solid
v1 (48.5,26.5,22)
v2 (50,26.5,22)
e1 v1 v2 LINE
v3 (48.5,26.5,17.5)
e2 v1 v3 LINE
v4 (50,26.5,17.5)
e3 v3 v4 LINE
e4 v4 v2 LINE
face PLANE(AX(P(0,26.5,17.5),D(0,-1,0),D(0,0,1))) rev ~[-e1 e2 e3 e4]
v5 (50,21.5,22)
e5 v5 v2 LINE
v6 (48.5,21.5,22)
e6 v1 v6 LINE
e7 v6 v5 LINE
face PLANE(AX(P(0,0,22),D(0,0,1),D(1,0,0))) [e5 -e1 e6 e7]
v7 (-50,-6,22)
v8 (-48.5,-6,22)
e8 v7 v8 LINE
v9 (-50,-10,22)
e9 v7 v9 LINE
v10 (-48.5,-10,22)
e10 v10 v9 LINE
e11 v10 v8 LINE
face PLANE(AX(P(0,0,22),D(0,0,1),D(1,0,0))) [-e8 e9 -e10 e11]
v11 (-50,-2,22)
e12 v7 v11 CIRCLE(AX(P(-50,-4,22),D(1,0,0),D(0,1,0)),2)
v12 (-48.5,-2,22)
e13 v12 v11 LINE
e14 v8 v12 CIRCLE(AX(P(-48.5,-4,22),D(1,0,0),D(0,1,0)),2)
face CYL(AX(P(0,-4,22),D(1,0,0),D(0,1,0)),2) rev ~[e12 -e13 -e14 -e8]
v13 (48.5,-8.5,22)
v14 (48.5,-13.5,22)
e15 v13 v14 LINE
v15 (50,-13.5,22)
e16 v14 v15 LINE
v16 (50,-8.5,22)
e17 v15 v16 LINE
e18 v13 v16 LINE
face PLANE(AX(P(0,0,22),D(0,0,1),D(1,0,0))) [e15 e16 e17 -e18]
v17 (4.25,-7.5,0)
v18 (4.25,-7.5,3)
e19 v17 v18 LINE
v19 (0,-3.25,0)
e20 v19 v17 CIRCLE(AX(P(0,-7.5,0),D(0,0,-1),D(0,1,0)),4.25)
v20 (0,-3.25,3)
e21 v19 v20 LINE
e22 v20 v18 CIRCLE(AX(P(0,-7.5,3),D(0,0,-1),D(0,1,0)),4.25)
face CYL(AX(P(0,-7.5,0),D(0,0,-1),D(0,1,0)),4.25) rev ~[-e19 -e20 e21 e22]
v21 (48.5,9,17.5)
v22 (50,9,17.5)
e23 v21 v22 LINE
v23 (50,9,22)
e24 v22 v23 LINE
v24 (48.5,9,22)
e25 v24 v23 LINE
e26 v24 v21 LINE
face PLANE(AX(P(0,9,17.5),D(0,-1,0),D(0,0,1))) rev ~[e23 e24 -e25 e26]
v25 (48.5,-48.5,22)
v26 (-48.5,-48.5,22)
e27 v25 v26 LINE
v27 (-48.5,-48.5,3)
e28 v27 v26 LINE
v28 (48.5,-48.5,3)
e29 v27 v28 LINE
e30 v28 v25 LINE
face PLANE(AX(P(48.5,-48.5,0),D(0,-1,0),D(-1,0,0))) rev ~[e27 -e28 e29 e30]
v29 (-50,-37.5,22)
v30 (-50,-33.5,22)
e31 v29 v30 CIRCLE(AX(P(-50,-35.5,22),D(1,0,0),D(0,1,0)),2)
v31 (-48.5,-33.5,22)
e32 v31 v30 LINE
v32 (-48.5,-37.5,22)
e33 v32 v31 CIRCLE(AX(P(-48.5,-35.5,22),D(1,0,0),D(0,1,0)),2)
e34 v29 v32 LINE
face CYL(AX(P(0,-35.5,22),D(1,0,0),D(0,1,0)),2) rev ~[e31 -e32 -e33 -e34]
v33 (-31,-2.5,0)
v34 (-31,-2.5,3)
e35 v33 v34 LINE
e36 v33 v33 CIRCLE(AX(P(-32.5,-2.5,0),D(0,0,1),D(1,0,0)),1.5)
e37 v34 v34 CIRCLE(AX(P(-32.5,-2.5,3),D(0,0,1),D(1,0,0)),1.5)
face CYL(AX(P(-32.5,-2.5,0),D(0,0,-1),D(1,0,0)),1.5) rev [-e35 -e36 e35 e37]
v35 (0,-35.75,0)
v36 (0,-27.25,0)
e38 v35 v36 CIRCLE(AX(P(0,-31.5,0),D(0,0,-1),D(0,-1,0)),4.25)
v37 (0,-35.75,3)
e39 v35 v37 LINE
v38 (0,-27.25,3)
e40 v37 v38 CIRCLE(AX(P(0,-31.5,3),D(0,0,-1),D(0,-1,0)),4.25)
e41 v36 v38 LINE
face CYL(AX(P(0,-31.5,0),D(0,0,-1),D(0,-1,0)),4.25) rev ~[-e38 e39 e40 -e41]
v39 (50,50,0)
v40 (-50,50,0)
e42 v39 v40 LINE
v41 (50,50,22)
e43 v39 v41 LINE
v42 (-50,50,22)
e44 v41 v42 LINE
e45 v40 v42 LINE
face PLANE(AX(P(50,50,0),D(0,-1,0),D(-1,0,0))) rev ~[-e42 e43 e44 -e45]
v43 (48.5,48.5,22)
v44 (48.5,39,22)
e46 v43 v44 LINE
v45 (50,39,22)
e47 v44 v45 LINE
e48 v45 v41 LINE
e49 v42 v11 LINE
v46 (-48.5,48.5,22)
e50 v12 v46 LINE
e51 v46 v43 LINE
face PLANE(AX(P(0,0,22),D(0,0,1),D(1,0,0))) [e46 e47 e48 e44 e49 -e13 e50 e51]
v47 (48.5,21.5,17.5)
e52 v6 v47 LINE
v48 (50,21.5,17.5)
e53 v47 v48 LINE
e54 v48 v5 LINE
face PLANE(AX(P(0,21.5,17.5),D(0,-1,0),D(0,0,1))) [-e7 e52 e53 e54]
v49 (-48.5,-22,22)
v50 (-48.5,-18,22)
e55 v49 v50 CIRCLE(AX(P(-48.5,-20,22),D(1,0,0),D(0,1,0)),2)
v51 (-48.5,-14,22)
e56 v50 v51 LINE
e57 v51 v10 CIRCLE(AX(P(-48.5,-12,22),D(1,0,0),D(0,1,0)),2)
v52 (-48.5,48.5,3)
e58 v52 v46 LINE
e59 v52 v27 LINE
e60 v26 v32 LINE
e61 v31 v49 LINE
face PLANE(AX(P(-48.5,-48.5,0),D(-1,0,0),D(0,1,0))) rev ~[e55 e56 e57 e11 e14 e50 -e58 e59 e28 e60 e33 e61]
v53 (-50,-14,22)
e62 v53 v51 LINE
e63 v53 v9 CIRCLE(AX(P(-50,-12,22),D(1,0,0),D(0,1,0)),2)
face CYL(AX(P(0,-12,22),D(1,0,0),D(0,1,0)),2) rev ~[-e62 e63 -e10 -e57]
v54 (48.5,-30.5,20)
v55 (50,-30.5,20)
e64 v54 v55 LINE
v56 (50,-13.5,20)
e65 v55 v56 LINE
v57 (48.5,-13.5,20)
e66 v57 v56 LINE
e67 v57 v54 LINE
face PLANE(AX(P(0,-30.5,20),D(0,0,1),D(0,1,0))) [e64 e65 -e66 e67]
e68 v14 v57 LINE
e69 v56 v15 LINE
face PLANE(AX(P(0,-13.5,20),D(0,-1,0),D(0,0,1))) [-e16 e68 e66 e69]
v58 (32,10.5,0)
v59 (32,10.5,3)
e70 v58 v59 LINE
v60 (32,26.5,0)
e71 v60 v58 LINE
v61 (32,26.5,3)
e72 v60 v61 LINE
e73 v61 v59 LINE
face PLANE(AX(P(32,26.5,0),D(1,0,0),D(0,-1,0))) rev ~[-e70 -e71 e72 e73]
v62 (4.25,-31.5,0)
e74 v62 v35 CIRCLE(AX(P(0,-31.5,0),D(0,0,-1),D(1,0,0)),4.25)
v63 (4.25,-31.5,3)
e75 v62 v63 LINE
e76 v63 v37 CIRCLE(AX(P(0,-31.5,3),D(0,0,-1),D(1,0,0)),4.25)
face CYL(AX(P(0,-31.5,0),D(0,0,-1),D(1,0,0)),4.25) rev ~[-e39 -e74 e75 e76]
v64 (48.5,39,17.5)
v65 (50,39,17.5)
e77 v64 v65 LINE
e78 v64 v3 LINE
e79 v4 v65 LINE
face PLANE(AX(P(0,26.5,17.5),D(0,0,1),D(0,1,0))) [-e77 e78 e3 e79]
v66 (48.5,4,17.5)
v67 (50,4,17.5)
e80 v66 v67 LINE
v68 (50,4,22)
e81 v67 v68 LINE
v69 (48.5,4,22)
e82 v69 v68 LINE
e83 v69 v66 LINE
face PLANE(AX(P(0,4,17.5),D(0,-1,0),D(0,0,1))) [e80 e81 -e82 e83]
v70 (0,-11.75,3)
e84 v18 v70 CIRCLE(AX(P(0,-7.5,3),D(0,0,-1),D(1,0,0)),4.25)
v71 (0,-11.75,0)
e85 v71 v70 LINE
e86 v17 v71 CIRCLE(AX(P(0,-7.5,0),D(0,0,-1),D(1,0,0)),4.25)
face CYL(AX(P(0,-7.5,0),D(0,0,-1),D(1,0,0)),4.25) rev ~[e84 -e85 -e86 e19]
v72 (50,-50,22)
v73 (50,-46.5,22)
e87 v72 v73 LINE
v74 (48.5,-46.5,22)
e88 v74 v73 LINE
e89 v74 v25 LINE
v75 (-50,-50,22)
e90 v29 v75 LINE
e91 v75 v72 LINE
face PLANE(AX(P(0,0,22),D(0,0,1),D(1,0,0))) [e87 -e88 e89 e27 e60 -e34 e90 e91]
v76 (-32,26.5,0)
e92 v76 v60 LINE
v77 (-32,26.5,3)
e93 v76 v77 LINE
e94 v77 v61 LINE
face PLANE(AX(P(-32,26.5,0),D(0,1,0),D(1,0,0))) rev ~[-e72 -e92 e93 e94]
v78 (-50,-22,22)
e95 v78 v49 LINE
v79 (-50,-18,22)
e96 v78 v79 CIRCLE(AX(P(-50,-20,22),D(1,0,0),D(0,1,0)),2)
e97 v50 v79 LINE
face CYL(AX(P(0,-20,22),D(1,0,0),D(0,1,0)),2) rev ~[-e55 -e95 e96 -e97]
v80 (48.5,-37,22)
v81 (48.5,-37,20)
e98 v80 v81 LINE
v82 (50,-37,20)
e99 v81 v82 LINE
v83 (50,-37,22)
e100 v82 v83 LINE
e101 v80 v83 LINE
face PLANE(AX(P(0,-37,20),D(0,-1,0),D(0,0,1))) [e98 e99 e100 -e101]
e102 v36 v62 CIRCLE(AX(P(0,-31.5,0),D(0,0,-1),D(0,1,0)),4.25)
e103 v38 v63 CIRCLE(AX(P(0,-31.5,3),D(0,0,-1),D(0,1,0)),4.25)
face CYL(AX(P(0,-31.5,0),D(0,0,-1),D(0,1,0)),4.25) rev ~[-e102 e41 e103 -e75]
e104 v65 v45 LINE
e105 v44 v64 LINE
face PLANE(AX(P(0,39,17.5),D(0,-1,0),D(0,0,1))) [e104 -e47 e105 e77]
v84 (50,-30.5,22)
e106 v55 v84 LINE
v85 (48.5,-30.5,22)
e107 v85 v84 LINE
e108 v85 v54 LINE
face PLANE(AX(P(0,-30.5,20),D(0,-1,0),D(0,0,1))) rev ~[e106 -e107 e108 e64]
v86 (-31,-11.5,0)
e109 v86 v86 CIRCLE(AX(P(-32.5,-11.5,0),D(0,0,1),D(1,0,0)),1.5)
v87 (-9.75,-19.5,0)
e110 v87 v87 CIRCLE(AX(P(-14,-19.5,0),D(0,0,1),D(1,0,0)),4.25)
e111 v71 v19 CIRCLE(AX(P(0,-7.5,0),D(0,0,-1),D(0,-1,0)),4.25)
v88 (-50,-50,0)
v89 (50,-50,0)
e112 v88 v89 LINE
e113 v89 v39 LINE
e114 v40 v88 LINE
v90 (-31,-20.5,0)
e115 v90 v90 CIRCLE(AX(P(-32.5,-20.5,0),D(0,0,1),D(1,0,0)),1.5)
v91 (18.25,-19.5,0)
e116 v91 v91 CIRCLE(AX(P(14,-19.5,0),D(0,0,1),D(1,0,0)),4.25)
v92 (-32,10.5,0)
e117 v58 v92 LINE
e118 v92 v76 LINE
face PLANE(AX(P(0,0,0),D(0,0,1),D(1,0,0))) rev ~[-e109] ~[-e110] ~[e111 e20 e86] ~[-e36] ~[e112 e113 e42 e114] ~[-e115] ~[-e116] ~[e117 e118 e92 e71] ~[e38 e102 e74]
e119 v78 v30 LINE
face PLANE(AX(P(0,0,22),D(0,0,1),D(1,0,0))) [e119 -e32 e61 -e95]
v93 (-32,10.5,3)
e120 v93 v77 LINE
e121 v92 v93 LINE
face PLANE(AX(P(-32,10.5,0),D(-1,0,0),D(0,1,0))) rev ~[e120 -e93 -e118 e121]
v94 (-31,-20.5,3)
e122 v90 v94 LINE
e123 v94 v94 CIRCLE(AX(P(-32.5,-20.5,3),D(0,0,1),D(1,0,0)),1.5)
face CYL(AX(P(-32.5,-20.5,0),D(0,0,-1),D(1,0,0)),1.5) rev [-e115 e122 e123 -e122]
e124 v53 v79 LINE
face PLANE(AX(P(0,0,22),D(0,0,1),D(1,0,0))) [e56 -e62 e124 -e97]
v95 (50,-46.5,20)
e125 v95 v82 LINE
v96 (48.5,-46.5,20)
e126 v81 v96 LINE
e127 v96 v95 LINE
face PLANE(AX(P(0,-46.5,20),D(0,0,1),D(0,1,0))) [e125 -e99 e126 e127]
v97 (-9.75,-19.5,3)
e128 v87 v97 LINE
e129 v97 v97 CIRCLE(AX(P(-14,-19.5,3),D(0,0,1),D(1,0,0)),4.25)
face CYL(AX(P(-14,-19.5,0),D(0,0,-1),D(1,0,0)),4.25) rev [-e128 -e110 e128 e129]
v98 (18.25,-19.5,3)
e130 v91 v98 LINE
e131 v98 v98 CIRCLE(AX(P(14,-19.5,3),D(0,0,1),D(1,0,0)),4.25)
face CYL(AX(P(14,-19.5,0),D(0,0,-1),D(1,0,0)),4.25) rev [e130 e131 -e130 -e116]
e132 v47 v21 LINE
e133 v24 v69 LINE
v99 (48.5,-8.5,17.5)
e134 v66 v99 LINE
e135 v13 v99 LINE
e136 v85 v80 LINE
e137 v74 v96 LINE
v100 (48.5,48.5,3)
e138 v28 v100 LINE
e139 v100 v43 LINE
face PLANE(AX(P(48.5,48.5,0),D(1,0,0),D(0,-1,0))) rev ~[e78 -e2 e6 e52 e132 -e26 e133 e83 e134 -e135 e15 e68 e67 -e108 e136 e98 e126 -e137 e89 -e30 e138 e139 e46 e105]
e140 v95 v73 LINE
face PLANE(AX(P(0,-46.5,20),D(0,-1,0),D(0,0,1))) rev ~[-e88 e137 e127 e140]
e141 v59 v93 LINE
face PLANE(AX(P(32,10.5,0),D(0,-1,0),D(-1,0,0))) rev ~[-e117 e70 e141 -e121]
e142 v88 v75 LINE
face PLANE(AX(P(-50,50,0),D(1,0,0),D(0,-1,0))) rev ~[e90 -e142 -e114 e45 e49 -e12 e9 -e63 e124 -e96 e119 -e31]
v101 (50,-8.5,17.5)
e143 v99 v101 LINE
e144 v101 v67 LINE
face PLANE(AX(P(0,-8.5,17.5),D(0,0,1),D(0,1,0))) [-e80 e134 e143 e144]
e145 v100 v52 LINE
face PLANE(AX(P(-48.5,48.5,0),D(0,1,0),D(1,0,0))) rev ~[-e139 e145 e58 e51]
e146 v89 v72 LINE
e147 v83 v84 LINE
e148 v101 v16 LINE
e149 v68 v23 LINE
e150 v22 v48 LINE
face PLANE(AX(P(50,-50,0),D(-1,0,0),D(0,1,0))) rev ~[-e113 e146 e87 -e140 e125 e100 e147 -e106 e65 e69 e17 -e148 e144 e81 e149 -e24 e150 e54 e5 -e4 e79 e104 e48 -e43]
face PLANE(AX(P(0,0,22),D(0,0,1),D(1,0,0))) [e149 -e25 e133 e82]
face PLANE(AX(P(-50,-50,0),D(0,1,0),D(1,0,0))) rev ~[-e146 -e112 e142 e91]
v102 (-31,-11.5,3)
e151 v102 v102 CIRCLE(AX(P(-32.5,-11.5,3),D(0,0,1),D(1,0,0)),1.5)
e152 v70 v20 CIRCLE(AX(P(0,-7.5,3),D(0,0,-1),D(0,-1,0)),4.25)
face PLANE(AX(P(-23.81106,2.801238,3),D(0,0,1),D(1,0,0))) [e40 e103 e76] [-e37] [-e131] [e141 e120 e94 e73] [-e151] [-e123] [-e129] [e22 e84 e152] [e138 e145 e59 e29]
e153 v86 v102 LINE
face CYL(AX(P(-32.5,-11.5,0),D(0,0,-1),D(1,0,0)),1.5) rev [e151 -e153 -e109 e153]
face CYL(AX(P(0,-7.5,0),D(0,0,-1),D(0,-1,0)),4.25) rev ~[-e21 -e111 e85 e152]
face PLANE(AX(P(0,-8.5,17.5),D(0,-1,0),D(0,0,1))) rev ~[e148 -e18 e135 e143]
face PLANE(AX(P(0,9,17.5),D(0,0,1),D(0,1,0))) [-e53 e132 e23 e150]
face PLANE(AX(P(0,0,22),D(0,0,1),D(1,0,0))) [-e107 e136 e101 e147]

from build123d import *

# Parameters (mm, degrees)
F0_R      = 1.5
F0_R_2    = 4.25
F1_DEPTH  = 3
F2_DEPTH  = 22
F3_W      = 9.5
F3_H      = 11
F2_FACE_W = 100
F2_FACE_H = 22
F4_DEPTH  = 50.001
F5_W      = 17
F5_H      = 3.3289747284
F6_DEPTH  = 76.9
F7_W      = 12.5
F7_H      = 8.2103219628
F7_H_2    = 8.3398447186
F7_H_3    = 8.5524427253
F8_DEPTH  = 63.2
F9_R      = 2
F10_DEPTH = 67.3


# Not quite as in the source:
# - a feature of the source that left no trace in its solid (it failed there, or was rolled back) is left out


with BuildPart() as f1:
    # F0 (on Top) → F1 (new body)
    with BuildSketch(Plane.XY):
        with BuildLine():
            Line((-48.5, -48.5), (0, -48.5))
            Line((0, -48.5), (0, -35.75))
            ThreePointArc((0, -35.75), (-4.25, -31.5), (0, -27.25))
            Line((0, -27.25), (0, -11.75))
            ThreePointArc((0, -11.75), (-4.25, -7.5), (0, -3.25))
            Line((0, -3.25), (0, 10.5))
            Line((0, 10.5), (-32, 10.5))
            Line((-32, 10.5), (-32, 26.5))
            Line((-32, 26.5), (0, 26.5))
            Line((0, 26.5), (0, 48.5))
            Line((0, 48.5), (-48.5, 48.5))
            Line((-48.5, 48.5), (-48.5, -48.5))
        make_face()
        with Locations((-32.5, -20.5)):
            Circle(F0_R, mode=Mode.SUBTRACT)
        with Locations((-32.5, -11.5)):
            Circle(F0_R, mode=Mode.SUBTRACT)
        with Locations((-32.5, -2.5)):
            Circle(F0_R, mode=Mode.SUBTRACT)
        with Locations((-14, -19.5)):
            Circle(F0_R_2, mode=Mode.SUBTRACT)
        with BuildLine():
            Line((0, -35.75), (0, -48.5))
            Line((0, -48.5), (48.5, -48.5))
            Line((48.5, -48.5), (48.5, 48.5))
            Line((48.5, 48.5), (0, 48.5))
            Line((0, 48.5), (0, 26.5))
            Line((0, 26.5), (32, 26.5))
            Line((32, 26.5), (32, 10.5))
            Line((32, 10.5), (0, 10.5))
            Line((0, 10.5), (0, -3.25))
            ThreePointArc((0, -3.25), (3.00520382, -4.49479618), (4.25, -7.5))
            ThreePointArc((4.25, -7.5), (3.00520382, -10.50520382), (0, -11.75))
            Line((0, -11.75), (0, -27.25))
            ThreePointArc((0, -27.25), (3.00520382, -28.49479618), (4.25, -31.5))
            ThreePointArc((4.25, -31.5), (3.00520382, -34.50520382), (0, -35.75))
        make_face()
        with Locations((14, -19.5)):
            Circle(F0_R_2, mode=Mode.SUBTRACT)
    extrude(amount=F1_DEPTH)

    # F0 (on Top) → F2 (join)
    with BuildSketch(Plane.XY):
        Polygon((50, 50), (-50, 50), (-50, -50), (0, -50), (50, -50), align=None)
        Polygon((48.5, -48.5), (0, -48.5), (-48.5, -48.5), (-48.5, 48.5), (0, 48.5), (48.5, 48.5), align=None, mode=Mode.SUBTRACT)
    extrude(amount=F2_DEPTH)

    # F3 (on Right) + F2_face (on face) → F4 (cut, through all)
    with BuildSketch(Plane.YZ):
        with Locations((-41.75, 25.5)):
            Rectangle(F3_W, F3_H)
    with BuildSketch(Plane(origin=(50, 0, 11), x_dir=(0, 1, 0), z_dir=(1, 0, 0))):
        Rectangle(F2_FACE_W, F2_FACE_H)
    extrude(amount=F4_DEPTH, mode=Mode.SUBTRACT)

    # F5 (on Right) → F6 (cut)
    with BuildSketch(Plane.YZ):
        with Locations((-22, 21.6644873642)):
            Rectangle(F5_W, F5_H)
    extrude(amount=F6_DEPTH, mode=Mode.SUBTRACT)

    # F7 (on Right) → F8 (cut)
    with BuildSketch(Plane.YZ):
        with Locations((32.75, 21.6051609814)):
            Rectangle(F7_W, F7_H)
        with Locations((15.25, 21.6699223593)):
            Rectangle(F7_W, F7_H_2)
        with Locations((-2.25, 21.7762213627)):
            Rectangle(F7_W, F7_H_3)
    extrude(amount=F8_DEPTH, mode=Mode.SUBTRACT)

    # F9 (on Right) → F10 (cut)
    with BuildSketch(Plane.YZ):
        with Locations((-12, 22)):
            Circle(F9_R)
        with Locations((-4, 22)):
            Circle(F9_R)
        with Locations((-20, 22)):
            Circle(F9_R)
        with Locations((-35.5, 22)):
            Circle(F9_R)
    extrude(amount=-F10_DEPTH, mode=Mode.SUBTRACT)


solid = f1.part
